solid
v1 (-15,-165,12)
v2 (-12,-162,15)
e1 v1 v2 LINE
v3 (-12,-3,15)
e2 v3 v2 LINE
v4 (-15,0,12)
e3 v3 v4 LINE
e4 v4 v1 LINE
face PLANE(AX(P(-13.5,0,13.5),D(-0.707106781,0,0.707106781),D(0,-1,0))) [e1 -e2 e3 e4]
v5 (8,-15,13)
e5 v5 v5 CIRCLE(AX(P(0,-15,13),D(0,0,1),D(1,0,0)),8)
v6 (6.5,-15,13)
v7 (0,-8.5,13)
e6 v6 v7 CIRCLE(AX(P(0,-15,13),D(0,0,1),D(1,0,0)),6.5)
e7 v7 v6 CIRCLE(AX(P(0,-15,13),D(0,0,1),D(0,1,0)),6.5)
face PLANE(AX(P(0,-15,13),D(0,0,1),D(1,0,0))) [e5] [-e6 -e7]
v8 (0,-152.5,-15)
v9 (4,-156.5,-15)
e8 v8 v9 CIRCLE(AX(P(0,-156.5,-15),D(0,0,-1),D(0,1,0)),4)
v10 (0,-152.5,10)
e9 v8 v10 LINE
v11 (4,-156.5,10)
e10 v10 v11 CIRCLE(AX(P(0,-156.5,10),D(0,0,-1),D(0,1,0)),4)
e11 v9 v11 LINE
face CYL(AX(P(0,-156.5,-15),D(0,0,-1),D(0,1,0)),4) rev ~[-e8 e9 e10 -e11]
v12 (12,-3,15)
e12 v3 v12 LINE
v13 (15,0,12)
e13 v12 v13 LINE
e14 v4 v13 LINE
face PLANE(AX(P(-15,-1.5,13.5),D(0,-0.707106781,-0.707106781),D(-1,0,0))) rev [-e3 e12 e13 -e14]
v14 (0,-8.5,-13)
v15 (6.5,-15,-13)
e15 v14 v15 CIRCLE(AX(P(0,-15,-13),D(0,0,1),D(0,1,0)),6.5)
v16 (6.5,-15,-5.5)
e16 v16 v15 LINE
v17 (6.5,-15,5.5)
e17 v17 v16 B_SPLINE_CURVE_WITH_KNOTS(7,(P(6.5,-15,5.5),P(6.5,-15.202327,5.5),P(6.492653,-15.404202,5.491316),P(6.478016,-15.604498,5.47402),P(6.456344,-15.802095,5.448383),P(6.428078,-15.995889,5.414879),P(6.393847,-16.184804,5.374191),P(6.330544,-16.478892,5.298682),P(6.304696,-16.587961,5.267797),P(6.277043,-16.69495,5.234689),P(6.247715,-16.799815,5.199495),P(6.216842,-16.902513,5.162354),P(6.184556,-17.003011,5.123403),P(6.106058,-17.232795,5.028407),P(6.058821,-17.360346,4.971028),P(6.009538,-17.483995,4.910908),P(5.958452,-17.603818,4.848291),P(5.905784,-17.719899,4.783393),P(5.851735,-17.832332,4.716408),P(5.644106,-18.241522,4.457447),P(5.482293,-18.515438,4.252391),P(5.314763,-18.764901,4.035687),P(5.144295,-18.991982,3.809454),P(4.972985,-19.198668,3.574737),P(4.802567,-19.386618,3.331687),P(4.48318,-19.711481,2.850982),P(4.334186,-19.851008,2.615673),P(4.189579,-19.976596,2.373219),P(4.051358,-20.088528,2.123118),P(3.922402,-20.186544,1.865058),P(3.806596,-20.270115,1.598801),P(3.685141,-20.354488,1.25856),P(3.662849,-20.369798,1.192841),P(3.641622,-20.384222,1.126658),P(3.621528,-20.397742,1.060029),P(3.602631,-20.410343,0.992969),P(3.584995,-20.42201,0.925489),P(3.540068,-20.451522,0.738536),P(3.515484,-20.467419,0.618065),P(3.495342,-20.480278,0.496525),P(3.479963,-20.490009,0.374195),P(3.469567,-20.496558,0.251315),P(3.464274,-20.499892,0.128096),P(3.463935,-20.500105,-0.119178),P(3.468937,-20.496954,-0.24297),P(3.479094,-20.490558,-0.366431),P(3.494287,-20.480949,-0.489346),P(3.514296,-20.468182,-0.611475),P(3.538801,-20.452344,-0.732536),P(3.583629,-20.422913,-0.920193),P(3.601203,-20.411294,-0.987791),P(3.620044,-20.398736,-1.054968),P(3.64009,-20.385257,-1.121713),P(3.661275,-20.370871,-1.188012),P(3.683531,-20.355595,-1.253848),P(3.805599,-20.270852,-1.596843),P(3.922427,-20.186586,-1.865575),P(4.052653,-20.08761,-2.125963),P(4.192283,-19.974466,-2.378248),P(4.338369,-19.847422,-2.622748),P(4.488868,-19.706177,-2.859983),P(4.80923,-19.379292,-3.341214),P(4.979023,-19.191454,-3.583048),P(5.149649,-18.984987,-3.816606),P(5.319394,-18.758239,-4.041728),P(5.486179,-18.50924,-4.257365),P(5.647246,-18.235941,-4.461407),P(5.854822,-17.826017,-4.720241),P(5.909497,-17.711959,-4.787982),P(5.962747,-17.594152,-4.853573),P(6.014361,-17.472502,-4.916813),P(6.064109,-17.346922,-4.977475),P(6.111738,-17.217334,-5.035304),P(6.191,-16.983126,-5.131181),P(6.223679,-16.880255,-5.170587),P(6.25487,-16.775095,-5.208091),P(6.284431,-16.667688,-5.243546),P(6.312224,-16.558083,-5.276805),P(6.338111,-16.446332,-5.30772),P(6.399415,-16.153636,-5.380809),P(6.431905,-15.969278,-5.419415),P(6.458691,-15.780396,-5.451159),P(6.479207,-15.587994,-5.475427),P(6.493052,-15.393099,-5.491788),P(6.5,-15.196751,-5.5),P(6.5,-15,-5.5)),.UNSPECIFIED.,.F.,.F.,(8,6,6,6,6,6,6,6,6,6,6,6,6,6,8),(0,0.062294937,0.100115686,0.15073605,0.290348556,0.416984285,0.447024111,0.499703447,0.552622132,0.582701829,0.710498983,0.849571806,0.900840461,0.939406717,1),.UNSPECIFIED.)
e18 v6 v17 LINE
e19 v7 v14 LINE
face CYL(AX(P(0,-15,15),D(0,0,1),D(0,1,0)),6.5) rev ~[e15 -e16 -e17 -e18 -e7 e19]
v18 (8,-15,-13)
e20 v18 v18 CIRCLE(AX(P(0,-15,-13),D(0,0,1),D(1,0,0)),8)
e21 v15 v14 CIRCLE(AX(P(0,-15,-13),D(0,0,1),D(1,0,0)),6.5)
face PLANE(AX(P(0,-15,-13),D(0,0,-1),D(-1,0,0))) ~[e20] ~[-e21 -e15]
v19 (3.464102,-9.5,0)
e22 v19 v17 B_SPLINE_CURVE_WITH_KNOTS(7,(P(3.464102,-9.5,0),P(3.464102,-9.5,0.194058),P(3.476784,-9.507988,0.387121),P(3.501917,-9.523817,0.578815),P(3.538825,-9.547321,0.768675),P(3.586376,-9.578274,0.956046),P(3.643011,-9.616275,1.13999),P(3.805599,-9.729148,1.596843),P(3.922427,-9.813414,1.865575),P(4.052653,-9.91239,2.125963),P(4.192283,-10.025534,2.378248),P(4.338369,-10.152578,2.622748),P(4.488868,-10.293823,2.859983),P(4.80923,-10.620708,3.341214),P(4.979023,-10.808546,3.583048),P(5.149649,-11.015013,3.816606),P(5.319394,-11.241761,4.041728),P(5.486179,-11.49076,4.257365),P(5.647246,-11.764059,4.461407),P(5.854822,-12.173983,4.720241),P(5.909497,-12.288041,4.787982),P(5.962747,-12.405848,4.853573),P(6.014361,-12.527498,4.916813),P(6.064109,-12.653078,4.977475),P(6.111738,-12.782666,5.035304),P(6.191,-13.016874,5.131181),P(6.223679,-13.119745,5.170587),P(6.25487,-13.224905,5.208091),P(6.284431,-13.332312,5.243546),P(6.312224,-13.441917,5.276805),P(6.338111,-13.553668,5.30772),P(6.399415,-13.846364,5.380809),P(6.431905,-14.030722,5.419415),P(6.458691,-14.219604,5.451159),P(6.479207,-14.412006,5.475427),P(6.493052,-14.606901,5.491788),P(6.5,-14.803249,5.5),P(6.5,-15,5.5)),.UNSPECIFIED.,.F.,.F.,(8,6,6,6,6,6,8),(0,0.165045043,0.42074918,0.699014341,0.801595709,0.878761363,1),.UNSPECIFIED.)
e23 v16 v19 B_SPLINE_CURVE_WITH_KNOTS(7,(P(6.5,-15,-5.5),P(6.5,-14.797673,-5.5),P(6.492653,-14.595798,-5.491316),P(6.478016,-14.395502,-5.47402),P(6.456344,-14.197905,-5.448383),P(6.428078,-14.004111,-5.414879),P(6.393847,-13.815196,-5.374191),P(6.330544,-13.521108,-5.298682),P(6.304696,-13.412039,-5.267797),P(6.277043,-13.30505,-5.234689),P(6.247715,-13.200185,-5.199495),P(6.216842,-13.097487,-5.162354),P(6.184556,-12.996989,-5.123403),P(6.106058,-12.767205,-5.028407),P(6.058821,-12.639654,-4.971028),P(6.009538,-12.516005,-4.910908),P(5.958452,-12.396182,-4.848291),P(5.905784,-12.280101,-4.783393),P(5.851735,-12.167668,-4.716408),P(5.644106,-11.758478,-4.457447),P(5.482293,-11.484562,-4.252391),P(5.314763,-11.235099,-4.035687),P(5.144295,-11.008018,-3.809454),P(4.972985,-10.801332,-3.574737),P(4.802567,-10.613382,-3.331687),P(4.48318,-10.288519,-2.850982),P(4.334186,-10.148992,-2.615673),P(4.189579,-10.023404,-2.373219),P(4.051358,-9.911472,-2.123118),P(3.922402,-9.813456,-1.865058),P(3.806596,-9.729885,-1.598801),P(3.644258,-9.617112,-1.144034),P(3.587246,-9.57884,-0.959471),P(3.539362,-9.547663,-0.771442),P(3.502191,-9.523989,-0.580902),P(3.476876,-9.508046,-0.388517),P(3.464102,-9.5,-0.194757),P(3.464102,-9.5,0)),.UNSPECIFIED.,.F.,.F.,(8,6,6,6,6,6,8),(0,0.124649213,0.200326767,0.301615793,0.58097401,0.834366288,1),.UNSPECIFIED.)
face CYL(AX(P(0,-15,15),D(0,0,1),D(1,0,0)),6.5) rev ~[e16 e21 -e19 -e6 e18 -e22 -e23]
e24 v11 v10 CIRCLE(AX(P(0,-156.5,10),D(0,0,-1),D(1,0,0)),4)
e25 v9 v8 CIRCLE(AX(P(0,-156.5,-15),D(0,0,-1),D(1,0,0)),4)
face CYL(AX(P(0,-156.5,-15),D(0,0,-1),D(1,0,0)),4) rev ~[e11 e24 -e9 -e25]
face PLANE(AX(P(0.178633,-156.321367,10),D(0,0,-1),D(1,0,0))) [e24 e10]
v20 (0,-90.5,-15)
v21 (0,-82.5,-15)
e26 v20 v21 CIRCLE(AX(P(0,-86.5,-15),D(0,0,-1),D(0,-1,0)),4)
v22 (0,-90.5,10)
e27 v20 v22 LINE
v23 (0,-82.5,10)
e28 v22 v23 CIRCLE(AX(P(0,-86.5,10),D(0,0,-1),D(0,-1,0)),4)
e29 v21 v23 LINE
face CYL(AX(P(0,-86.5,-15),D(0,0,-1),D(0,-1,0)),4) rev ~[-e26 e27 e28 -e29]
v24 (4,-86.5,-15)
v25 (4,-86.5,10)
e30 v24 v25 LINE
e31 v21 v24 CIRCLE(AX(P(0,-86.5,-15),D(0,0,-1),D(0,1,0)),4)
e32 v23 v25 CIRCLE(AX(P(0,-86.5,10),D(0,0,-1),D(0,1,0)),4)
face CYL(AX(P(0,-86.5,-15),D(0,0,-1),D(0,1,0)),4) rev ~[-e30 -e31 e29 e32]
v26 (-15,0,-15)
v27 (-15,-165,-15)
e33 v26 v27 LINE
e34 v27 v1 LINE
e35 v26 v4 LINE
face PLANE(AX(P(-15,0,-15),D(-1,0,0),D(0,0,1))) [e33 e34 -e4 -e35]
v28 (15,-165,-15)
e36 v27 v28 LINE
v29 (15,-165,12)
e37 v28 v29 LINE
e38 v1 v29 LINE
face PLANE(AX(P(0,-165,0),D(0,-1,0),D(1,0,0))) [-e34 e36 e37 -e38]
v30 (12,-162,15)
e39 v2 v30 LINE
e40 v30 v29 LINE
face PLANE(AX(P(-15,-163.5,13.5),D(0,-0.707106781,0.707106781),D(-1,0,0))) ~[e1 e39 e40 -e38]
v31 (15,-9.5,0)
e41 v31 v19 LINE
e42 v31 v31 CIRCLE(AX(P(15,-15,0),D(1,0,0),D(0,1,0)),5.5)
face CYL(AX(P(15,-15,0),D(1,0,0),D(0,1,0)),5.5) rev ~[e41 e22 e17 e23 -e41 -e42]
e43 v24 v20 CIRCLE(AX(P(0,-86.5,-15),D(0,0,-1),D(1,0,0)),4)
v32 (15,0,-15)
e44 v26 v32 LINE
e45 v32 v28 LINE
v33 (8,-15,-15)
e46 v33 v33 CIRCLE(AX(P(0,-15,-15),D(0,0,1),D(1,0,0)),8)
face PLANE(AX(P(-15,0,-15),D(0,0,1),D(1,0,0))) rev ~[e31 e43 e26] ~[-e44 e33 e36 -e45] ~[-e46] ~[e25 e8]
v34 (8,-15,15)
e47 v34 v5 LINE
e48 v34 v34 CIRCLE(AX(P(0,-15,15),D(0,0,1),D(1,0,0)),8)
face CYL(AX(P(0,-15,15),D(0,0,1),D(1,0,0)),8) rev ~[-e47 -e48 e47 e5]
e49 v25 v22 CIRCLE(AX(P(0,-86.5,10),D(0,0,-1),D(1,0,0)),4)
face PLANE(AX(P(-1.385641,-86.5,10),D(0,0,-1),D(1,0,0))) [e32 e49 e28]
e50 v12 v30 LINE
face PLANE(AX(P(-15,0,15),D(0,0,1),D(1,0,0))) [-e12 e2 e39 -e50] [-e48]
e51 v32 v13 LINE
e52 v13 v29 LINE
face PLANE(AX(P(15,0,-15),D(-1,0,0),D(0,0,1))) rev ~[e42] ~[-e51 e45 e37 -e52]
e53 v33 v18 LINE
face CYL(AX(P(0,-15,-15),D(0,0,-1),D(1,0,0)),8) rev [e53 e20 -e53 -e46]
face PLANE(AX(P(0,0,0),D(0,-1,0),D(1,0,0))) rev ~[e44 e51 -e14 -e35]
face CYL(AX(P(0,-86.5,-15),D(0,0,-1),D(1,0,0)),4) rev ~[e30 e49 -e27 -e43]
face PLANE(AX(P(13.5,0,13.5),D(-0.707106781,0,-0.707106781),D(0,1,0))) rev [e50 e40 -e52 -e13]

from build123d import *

# Parameters (mm, degrees)
F0_W      = 30
F0_H      = 30
F1_DEPTH  = 165
F3_DEPTH  = 30
F4_R      = 5.5
F5_DEPTH  = 12.3
F6_R      = 8
F6_R_2    = 6.5
F7_DEPTH  = 2
F8_SIZE   = 3
F10_DEPTH = 25


# Not quite as in the source:
# - a pattern or mirror of a feature is missing from the dataset's text; its kind, count and spacing are read off the source's solid


with BuildPart() as f1:
    # F0 (on Front) → F1 (new body)
    with BuildSketch(Plane.XZ):
        Rectangle(F0_W, F0_H)
    extrude(amount=F1_DEPTH)

    # F2 (on face) → F3 (cut)
    with BuildSketch(Plane.XY.offset(15)):
        with BuildLine():
            ThreePointArc((0, -8.5), (-4.5961940777, -19.5961940777), (6.5, -15))
            ThreePointArc((6.5, -15), (4.5961940777, -10.4038059223), (0, -8.5))
        make_face()
    extrude(amount=-F3_DEPTH, mode=Mode.SUBTRACT)

    # F4 (on face) → F5 (cut)
    with BuildSketch(Plane.YZ.offset(15)):
        with Locations((-15, 0)):
            Circle(F4_R)
    extrude(amount=-F5_DEPTH, mode=Mode.SUBTRACT)

    # F6 (on face) → F7 (cut)
    with BuildSketch(Plane.XY.offset(15)):
        with Locations((0, -15)):
            Circle(F6_R)
        with Locations((0, -15)):
            Circle(F6_R_2, mode=Mode.SUBTRACT)
        with Locations((0, -15)):
            Circle(F6_R_2)
    f7 = extrude(amount=-F7_DEPTH, mode=Mode.SUBTRACT)

    # F7_copies: F7 across plane
    add(f7.mirror(Plane(origin=(0, 0, 0), x_dir=(-1, 0, 0), z_dir=(0, 0, -1))), mode=Mode.SUBTRACT)

    # F8
    f8_edges = [f1.edges().sort_by_distance(p)[0] for p in [
        (15, -82.5, 15),
        (0, 0, 15),
        (-15, -82.5, 15),
        (0, -165, 15),
    ]]
    chamfer(f8_edges, length=F8_SIZE)

    # F9 (on face) → F10 (cut)
    with BuildSketch(Plane(origin=(0, 0, -15), x_dir=(1, 0, 0), z_dir=(0, 0, -1))):
        with BuildLine():
            ThreePointArc((0, 90.5), (-4, 86.5), (0, 82.5))
            Line((0, 82.5), (0, 86.5))
            Line((0, 86.5), (0, 90.5))
        make_face()
        with BuildLine():
            Line((0, 86.5), (0, 82.5))
            ThreePointArc((0, 82.5), (2.8284271247, 83.6715728753), (4, 86.5))
            ThreePointArc((4, 86.5), (2.8284271247, 89.3284271247), (0, 90.5))
            Line((0, 90.5), (0, 86.5))
        make_face()
        with BuildLine():
            ThreePointArc((4, 156.5), (-2.8284271247, 159.3284271247), (0, 152.5))
            ThreePointArc((0, 152.5), (2.8284271247, 153.6715728753), (4, 156.5))
        make_face()
    extrude(amount=-F10_DEPTH, mode=Mode.SUBTRACT)


solid = f1.part
